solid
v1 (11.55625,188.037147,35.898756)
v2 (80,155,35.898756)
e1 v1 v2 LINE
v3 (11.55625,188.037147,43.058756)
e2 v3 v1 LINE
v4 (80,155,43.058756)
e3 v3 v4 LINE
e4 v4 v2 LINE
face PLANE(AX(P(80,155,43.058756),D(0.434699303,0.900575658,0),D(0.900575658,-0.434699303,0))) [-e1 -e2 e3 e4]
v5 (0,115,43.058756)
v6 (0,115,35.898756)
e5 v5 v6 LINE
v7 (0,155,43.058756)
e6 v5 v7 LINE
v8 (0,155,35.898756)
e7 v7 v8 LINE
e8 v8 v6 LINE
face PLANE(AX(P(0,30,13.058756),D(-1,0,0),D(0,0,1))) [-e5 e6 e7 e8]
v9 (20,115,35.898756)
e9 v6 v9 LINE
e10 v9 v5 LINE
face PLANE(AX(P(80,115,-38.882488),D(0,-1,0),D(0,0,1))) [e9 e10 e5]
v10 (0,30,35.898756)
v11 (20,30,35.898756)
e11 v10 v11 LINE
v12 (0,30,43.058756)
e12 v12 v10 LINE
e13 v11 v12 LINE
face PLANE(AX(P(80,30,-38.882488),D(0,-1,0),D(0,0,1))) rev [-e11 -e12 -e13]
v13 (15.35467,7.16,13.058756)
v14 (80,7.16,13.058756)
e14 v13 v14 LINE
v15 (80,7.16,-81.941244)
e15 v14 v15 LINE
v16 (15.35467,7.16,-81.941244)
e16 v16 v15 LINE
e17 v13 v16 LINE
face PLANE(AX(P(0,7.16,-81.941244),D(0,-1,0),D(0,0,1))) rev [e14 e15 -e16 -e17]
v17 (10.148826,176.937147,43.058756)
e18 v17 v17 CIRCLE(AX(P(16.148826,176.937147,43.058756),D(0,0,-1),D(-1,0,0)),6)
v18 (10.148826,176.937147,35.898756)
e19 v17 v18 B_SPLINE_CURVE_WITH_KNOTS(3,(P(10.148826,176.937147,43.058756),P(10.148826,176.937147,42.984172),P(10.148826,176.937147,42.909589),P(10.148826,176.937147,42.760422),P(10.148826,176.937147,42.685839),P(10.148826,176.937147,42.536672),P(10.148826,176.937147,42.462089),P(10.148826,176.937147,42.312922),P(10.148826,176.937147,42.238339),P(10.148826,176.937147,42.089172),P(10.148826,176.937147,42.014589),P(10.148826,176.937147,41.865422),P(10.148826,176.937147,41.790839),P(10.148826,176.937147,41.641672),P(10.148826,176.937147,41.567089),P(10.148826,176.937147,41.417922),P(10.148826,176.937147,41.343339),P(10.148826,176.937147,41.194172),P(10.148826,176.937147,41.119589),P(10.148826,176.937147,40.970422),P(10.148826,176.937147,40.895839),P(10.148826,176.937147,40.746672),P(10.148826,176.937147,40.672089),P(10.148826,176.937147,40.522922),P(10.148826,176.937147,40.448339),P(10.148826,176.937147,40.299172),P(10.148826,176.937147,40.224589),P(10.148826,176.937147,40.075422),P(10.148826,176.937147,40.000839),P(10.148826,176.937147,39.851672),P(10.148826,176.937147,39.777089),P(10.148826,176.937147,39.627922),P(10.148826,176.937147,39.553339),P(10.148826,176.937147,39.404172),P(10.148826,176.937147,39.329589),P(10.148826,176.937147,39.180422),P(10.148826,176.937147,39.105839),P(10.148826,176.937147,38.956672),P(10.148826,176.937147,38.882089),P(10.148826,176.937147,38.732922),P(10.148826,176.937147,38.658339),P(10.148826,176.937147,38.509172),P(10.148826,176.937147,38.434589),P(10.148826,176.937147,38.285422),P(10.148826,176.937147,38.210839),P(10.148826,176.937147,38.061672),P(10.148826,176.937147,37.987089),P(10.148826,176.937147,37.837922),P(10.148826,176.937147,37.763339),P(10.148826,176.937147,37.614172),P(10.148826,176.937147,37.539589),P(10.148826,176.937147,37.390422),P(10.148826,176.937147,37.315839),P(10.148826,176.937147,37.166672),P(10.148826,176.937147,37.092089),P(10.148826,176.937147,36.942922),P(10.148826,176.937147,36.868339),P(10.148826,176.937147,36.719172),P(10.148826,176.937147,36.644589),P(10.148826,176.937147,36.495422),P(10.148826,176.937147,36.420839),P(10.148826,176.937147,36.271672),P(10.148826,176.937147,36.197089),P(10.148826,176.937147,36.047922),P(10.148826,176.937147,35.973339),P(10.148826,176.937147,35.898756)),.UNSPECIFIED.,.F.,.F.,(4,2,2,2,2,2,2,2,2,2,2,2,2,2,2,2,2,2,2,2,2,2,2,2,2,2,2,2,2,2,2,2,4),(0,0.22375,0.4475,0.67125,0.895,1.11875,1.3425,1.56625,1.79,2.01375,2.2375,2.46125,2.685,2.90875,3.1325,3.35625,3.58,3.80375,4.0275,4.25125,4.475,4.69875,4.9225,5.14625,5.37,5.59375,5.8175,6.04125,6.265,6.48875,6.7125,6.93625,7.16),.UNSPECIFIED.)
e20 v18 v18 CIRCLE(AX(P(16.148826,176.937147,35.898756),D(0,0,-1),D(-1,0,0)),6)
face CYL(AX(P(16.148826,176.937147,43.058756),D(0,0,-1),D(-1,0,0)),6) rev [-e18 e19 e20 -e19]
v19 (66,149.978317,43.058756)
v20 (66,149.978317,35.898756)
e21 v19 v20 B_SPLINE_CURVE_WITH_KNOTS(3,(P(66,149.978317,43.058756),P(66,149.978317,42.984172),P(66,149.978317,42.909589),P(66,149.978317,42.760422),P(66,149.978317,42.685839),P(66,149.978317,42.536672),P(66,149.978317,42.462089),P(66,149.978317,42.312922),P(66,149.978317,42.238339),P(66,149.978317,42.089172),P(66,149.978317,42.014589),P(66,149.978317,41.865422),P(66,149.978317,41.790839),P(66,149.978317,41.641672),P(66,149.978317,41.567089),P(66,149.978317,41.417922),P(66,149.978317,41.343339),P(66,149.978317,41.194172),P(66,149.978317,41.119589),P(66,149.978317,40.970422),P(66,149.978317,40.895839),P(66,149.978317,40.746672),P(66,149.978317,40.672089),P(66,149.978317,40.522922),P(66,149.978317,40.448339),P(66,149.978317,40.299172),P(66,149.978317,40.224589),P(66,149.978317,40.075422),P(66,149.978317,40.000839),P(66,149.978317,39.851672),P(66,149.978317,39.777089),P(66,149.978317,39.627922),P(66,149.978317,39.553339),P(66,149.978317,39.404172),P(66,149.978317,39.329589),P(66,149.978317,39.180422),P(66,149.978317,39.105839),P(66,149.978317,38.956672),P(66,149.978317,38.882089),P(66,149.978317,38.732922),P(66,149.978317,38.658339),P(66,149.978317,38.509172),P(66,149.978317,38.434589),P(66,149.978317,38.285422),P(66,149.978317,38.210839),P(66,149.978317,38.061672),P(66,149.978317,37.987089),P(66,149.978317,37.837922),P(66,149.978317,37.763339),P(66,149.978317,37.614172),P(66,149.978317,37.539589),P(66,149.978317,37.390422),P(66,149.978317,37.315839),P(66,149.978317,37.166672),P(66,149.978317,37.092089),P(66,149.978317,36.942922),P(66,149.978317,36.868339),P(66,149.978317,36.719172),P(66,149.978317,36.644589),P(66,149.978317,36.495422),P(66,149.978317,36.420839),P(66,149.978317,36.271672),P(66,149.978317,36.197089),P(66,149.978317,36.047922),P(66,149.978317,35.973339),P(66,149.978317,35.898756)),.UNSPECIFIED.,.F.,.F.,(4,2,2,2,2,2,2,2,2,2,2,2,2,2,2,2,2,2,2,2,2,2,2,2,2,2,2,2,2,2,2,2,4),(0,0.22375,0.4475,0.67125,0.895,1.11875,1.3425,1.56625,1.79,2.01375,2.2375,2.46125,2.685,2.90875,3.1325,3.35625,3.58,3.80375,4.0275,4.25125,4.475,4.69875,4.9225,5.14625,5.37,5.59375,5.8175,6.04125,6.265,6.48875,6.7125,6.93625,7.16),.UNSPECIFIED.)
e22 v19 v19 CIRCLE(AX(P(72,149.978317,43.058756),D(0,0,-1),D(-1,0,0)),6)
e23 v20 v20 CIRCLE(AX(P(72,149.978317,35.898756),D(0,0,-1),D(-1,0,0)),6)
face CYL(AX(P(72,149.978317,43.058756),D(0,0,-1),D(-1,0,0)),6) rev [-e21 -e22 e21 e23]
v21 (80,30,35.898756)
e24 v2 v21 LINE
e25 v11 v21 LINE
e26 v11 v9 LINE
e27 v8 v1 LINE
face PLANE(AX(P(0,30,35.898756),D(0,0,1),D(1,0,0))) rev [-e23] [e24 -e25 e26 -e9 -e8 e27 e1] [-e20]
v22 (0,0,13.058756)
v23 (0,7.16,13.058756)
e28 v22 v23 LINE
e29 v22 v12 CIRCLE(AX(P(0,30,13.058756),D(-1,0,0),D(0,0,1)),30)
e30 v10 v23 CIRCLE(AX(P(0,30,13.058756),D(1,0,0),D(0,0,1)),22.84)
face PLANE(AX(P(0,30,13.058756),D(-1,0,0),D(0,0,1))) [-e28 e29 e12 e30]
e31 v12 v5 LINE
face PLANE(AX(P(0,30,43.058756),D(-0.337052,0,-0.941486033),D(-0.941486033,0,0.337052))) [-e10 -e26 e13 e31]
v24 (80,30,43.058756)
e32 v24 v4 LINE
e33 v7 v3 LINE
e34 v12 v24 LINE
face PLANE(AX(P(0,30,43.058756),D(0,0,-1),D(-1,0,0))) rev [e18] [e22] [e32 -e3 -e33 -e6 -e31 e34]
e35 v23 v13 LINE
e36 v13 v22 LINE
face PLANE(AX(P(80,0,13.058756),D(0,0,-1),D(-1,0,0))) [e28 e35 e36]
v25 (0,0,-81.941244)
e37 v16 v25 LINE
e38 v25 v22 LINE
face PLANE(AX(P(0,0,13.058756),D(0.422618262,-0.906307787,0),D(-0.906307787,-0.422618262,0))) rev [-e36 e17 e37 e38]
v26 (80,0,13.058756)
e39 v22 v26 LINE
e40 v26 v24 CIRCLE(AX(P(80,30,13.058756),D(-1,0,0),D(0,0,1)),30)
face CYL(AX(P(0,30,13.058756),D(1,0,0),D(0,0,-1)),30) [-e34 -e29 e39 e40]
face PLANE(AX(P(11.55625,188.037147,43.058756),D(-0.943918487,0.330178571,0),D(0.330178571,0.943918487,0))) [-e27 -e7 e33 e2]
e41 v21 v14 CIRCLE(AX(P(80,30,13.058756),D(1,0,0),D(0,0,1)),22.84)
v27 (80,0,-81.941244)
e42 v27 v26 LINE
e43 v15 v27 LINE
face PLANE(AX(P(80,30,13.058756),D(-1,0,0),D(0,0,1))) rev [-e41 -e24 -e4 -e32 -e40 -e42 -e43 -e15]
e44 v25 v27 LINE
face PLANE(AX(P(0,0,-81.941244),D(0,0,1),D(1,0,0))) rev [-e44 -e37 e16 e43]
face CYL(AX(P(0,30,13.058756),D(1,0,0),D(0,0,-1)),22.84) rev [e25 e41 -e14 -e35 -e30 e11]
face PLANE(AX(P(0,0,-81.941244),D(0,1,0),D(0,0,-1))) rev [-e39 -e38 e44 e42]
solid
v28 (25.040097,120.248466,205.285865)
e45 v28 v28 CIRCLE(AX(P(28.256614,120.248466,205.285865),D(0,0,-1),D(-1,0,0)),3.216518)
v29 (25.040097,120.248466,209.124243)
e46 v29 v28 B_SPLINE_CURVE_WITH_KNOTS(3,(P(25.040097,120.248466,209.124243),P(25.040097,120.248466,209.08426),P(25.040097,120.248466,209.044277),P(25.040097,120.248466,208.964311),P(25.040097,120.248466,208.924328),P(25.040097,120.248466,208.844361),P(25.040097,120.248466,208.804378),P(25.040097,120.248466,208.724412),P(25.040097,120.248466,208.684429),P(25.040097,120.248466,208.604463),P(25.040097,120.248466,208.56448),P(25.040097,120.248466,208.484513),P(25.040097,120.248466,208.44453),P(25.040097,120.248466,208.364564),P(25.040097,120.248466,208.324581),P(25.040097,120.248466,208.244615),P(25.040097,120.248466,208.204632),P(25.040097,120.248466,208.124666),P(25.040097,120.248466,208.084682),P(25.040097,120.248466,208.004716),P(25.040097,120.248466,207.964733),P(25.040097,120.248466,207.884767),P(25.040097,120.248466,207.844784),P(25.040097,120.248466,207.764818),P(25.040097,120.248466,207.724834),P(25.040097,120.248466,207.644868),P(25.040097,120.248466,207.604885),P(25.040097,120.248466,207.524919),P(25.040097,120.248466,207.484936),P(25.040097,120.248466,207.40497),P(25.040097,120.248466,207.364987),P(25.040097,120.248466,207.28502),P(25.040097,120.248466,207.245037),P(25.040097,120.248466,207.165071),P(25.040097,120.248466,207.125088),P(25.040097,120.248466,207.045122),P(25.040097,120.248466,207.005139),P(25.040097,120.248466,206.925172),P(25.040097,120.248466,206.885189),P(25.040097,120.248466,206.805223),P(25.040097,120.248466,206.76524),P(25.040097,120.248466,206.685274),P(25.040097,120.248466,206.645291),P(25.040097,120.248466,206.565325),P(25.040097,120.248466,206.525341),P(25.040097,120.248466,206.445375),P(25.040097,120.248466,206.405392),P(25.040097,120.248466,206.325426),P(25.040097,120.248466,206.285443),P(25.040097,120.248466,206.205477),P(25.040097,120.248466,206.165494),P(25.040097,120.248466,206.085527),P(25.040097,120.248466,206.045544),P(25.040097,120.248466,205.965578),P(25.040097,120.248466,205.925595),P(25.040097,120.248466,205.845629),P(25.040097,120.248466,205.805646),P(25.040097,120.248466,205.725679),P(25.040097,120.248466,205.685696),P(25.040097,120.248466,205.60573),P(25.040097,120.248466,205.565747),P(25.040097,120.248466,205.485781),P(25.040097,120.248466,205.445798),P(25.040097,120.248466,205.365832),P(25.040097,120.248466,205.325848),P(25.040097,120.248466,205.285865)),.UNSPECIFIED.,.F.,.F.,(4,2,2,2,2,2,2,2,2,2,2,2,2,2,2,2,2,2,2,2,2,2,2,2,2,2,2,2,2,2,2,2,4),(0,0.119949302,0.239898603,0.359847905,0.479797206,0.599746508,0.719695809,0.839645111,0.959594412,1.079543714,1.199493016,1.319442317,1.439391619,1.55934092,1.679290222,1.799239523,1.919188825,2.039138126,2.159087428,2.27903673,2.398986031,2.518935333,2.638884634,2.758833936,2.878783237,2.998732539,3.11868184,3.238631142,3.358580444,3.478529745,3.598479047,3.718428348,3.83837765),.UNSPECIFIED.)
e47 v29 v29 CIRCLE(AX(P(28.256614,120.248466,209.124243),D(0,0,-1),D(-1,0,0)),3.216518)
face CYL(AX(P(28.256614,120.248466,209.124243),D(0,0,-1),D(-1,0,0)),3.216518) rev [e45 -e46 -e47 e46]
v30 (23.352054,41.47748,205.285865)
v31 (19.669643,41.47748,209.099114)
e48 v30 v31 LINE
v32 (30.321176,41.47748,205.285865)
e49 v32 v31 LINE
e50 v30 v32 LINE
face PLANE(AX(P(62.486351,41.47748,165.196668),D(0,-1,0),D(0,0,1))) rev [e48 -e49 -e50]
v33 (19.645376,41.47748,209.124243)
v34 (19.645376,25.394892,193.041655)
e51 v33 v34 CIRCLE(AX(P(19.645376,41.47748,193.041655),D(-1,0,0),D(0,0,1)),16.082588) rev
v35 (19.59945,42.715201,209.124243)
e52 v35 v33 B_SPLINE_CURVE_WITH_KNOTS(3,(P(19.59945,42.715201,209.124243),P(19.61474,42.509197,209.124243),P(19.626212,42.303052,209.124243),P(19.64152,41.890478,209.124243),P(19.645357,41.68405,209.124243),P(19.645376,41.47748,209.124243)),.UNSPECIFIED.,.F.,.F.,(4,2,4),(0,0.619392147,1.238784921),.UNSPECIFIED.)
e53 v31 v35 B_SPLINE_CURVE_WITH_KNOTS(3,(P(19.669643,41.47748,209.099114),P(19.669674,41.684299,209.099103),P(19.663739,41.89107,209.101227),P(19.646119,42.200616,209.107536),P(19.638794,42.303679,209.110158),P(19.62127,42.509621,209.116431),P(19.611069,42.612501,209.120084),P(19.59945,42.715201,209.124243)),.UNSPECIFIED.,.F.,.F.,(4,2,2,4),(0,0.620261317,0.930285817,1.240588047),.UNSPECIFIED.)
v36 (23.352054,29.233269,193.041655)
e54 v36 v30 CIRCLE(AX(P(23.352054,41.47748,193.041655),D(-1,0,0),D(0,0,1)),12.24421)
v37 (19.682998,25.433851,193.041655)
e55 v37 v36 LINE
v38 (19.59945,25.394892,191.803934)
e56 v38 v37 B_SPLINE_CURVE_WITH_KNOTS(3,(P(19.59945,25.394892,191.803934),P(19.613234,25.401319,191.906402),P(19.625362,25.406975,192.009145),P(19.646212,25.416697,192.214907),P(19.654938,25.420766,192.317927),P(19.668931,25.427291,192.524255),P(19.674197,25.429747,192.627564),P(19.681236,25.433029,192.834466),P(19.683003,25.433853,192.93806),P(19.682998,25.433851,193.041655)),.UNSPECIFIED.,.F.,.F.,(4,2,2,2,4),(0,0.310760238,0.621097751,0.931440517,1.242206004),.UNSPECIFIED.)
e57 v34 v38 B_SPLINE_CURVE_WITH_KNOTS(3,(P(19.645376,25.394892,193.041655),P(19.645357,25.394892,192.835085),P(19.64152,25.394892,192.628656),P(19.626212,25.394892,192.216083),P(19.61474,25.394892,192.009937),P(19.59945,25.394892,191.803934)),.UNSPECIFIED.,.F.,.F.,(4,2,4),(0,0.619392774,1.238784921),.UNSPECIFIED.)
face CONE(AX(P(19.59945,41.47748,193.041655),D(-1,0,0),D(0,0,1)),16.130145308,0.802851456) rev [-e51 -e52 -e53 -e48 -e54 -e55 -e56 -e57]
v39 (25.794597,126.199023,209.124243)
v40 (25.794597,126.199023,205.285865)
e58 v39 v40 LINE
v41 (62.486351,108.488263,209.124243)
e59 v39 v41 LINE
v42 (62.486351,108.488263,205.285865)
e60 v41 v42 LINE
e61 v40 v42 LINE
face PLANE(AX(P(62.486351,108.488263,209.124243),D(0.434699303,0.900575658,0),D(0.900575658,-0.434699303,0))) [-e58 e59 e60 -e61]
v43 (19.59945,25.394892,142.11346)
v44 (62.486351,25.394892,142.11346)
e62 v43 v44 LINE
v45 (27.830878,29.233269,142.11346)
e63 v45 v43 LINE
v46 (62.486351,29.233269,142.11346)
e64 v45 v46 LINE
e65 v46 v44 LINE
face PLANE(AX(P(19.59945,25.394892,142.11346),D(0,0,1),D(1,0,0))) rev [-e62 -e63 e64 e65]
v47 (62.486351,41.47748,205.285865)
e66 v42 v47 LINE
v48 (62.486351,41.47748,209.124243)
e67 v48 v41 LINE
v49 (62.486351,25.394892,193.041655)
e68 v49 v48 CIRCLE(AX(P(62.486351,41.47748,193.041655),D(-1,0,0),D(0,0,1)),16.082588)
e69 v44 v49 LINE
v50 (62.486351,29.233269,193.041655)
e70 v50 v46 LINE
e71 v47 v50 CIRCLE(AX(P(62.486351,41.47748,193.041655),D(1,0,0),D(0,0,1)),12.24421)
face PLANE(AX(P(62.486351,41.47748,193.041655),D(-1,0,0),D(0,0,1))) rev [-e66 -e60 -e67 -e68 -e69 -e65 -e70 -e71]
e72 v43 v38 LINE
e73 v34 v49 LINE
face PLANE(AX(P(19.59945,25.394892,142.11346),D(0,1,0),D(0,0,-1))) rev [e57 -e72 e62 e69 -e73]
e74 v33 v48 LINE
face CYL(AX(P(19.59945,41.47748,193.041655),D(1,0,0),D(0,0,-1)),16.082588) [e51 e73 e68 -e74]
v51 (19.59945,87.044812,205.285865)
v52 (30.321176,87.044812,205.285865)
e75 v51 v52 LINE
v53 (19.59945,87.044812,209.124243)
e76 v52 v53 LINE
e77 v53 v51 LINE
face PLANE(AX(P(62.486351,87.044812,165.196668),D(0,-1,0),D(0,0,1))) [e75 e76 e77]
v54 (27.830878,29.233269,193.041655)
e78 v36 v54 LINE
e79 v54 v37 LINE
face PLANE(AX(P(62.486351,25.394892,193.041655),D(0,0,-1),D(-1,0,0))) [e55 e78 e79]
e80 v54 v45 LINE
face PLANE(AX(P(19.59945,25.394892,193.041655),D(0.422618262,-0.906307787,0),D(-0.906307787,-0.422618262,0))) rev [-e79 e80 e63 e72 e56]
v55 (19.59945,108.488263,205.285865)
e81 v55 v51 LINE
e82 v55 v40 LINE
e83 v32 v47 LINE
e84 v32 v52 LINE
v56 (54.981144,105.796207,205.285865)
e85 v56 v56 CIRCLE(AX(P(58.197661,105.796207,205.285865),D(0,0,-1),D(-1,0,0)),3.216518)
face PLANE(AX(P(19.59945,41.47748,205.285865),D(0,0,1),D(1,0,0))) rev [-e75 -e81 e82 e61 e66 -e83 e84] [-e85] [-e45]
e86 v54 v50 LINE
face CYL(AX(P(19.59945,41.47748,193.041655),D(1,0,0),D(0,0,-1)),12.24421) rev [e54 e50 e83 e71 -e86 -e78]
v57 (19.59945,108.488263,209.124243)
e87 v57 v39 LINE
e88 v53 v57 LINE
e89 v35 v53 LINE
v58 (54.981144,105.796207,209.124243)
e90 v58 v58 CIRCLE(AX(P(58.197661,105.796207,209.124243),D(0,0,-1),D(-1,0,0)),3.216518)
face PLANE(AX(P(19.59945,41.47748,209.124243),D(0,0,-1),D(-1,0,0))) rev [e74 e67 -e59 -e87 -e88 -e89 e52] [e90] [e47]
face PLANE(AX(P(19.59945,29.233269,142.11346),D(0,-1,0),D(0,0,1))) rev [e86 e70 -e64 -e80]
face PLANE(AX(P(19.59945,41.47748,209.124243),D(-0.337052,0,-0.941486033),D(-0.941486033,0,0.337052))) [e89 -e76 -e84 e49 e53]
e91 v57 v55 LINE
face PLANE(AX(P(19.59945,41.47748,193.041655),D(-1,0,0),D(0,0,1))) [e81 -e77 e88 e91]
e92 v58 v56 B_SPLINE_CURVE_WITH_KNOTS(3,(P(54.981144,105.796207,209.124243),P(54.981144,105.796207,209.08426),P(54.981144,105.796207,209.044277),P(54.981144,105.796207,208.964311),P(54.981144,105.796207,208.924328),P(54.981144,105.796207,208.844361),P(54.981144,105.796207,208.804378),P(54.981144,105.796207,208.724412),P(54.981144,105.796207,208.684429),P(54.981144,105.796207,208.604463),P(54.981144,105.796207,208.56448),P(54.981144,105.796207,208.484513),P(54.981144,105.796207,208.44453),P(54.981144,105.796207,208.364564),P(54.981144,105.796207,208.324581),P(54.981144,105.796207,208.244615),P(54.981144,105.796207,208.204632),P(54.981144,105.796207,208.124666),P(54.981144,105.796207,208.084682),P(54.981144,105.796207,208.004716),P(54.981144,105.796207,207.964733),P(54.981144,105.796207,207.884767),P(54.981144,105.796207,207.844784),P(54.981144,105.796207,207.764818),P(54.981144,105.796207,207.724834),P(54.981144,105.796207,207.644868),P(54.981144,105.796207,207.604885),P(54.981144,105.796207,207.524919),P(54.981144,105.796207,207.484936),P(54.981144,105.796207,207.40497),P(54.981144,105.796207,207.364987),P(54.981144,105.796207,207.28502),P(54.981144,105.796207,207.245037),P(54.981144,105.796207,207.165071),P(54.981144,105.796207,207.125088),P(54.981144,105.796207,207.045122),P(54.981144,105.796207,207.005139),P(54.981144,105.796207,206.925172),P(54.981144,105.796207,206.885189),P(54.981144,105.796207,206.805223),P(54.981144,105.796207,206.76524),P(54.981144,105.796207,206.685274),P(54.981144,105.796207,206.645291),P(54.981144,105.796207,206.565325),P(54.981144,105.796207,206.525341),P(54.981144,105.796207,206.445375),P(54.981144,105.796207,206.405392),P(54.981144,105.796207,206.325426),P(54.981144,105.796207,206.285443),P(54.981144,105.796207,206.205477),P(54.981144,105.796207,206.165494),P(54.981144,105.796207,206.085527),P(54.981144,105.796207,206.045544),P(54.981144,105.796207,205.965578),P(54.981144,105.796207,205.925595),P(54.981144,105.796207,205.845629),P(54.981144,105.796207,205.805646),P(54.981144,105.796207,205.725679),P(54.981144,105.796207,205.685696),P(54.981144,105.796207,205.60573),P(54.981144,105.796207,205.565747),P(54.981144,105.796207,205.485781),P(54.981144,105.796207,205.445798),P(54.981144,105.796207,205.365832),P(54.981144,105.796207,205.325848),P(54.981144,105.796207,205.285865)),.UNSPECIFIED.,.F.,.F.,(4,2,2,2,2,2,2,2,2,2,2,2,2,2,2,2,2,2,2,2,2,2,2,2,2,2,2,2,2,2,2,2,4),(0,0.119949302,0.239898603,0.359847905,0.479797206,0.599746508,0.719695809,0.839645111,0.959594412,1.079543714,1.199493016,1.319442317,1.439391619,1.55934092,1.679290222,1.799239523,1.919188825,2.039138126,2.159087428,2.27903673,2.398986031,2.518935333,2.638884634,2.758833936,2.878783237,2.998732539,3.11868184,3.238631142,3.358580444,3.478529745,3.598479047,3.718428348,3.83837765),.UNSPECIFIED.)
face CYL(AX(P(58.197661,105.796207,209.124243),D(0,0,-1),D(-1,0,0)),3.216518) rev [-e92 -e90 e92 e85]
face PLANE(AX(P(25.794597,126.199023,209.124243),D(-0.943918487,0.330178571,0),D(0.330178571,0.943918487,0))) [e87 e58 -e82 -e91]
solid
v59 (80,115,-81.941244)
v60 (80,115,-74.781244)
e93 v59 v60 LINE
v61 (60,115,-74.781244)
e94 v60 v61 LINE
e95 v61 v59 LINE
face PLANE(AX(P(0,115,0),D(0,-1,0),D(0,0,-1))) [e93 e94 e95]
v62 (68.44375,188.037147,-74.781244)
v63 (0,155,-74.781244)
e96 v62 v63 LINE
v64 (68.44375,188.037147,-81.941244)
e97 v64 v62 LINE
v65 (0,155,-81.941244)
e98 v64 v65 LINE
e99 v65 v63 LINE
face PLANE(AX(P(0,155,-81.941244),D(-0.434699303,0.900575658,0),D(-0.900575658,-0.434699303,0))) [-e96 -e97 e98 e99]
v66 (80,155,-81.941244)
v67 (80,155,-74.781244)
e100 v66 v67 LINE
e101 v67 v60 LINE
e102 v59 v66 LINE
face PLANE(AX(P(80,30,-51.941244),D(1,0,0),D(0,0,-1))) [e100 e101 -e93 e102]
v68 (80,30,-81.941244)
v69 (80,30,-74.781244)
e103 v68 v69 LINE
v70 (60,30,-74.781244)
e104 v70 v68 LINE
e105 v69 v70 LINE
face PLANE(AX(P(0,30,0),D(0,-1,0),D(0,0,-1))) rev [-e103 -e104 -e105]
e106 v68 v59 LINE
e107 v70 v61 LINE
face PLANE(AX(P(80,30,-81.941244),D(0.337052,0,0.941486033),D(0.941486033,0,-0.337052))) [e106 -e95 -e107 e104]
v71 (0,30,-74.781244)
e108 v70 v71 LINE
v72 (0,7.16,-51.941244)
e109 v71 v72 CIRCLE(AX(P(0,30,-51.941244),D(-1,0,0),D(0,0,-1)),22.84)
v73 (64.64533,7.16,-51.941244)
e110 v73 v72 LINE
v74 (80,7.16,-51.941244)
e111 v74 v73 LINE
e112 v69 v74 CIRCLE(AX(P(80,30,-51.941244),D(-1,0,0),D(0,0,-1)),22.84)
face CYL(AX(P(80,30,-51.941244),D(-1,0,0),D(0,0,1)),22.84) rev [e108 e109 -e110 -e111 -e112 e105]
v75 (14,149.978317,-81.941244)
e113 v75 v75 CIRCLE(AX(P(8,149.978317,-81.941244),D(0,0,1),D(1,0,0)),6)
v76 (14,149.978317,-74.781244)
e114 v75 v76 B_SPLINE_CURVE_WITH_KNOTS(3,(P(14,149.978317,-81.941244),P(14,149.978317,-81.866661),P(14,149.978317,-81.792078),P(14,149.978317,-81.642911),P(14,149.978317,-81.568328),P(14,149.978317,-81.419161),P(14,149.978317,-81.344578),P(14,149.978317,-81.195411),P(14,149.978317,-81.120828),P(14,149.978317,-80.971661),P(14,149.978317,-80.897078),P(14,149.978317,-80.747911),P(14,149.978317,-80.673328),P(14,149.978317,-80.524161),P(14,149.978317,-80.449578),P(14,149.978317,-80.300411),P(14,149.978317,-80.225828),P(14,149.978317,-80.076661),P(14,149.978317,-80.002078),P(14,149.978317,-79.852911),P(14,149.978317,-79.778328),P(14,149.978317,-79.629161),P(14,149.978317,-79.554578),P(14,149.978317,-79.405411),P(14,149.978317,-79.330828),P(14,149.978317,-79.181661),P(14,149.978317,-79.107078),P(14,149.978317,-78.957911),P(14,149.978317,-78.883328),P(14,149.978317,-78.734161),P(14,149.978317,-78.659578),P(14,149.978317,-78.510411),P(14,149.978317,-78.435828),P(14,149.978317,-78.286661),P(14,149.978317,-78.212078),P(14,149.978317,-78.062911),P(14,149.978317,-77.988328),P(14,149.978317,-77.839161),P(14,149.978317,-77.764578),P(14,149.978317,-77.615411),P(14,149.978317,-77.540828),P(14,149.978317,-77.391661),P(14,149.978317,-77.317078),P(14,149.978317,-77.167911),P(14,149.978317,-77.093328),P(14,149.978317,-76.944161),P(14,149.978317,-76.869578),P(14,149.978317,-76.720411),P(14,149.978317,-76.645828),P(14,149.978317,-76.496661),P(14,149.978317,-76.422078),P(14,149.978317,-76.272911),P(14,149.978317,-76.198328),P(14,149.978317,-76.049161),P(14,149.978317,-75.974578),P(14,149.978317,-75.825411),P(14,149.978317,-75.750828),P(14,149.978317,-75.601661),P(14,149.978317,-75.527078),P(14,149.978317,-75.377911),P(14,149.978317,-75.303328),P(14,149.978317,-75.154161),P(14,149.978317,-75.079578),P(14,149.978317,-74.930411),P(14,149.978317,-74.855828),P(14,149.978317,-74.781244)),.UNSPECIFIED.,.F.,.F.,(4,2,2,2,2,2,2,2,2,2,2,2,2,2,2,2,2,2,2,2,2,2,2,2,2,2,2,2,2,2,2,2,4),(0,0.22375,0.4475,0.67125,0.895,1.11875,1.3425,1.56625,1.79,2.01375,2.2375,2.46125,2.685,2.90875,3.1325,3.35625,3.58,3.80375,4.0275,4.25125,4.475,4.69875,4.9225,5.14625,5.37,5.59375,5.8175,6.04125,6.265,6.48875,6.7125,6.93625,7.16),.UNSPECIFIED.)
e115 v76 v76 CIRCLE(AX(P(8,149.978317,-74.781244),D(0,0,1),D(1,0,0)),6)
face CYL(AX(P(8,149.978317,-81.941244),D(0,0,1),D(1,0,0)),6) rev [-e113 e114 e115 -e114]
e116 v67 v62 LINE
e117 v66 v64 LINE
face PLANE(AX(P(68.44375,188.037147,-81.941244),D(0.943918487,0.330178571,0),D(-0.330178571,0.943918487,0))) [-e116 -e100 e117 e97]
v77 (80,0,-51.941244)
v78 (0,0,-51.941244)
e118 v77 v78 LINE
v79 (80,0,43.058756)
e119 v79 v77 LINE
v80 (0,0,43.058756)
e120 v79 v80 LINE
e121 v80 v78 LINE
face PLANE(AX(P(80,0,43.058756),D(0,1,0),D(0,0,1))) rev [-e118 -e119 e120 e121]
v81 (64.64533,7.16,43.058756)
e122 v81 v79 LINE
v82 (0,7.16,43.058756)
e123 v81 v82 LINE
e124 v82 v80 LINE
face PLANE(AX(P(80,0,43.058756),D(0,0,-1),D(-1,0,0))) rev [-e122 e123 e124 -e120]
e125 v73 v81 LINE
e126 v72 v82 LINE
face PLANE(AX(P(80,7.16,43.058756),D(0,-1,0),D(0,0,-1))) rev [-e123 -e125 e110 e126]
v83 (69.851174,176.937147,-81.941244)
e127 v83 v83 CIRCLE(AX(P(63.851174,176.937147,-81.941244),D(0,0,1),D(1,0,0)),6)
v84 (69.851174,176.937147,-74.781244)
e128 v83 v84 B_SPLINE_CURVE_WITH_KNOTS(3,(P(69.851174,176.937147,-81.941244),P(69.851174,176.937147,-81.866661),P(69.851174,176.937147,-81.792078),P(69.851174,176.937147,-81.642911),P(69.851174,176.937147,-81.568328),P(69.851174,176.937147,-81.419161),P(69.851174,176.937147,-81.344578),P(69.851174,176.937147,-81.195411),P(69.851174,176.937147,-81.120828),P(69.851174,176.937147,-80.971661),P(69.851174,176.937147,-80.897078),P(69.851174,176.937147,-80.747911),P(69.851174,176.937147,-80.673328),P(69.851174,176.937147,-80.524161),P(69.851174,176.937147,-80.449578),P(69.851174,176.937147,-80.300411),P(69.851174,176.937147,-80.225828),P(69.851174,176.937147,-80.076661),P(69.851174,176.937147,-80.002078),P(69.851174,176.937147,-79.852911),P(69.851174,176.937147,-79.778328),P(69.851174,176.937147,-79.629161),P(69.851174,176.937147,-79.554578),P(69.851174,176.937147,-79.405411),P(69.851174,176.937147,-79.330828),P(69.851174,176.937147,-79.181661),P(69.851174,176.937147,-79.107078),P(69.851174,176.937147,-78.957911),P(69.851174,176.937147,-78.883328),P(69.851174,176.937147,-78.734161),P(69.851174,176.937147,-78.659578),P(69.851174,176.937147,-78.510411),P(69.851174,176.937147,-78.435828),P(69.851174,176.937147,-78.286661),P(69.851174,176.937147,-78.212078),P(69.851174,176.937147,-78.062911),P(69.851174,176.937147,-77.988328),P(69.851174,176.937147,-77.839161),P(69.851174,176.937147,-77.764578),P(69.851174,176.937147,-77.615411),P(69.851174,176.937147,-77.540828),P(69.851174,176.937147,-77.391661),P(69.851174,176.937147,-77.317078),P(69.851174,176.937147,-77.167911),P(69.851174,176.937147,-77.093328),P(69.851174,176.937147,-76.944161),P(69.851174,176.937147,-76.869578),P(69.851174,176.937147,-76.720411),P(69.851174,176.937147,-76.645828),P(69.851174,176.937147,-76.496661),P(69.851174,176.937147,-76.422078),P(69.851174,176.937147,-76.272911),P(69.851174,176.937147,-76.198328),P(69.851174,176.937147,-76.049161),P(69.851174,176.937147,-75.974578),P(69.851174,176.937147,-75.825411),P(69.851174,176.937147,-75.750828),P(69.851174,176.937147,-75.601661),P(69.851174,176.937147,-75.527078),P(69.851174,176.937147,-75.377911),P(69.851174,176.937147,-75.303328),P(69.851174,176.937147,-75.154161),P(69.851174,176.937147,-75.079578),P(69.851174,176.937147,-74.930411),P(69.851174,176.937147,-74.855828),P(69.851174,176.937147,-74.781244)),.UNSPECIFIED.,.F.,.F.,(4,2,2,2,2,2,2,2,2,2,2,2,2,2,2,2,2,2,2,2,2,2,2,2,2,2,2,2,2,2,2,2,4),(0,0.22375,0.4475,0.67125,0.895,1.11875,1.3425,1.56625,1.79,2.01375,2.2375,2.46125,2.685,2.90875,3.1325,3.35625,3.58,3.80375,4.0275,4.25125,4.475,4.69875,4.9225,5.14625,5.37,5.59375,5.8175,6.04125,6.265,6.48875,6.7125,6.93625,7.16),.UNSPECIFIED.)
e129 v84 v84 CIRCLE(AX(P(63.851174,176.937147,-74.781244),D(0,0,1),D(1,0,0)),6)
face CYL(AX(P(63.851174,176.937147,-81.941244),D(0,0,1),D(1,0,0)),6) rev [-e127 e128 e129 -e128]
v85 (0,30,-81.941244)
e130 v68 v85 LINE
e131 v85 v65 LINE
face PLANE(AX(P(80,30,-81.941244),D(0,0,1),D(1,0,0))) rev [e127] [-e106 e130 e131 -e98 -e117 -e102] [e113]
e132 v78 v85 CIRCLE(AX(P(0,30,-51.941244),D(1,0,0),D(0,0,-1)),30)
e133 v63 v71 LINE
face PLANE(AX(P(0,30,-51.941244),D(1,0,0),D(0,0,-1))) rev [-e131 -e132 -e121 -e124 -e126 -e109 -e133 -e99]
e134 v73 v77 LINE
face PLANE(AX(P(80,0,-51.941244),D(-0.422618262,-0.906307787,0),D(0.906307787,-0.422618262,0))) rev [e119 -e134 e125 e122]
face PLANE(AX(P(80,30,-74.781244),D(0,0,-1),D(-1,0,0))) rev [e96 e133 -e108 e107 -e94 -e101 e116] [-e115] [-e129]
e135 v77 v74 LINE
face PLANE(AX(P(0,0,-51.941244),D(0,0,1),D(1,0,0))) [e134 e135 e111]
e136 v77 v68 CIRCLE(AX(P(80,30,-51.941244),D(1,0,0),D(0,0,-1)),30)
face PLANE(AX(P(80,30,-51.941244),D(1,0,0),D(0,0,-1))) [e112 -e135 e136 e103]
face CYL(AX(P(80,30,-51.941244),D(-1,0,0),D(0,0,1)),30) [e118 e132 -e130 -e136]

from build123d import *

# Parameters (mm, degrees)
BOSS_EXTRUDE1_DEPTH   = 80
BOSS_EXTRUDE2_DEPTH   = 7.16
SKETCH3_R             = 6
CUT_EXTRUDE1_DEPTH    = 7.16
CUT_EXTRUDE6_DEPTH    = 95
CUT_EXTRUDE7_DEPTH    = 85
BODY_MOVE_COPY5_ANGLE = 180
CHAMFER1_SIZE         = 7
CHAMFER1_SIZE_2       = 7.248712197
SCALE1_SCALE          = 0.714781685
SCALE2_SCALE          = 0.5
SCALE3_SCALE          = 1.5


with BuildPart() as part:
    # Sketch1 → Boss-Extrude1 (new body)
    with BuildSketch(Plane(origin=(0, 0, 0), x_dir=(0, 0, -1), z_dir=(1, 0, 0))):
        with BuildLine():
            Line((-43.05875576, 0), (51.94124424, 0))
            ThreePointArc((51.94124424, 0), (73.154447675, 8.786796564), (81.94124424, 30))
            Line((81.94124424, 30), (81.94124424, 155))
            Line((81.94124424, 155), (74.78124424, 155))
            Line((74.78124424, 155), (74.78124424, 30))
            ThreePointArc((74.78124424, 30), (68.091563122, 13.849681118), (51.94124424, 7.16))
            Line((51.94124424, 7.16), (-43.05875576, 7.16))
            Line((-43.05875576, 7.16), (-43.05875576, 0))
        make_face()
    extrude(amount=BOSS_EXTRUDE1_DEPTH)

    # Sketch2 → Boss-Extrude2 (add)
    with BuildSketch(Plane.XY.offset(-74.78124424)):
        Polygon((0, 155), (68.44375, 188.037147061), (80, 155), align=None)
    extrude(amount=-BOSS_EXTRUDE2_DEPTH)

    # Sketch3 → Cut-Extrude1 (cut)
    with BuildSketch(Plane.XY.offset(-74.78124424)):
        with Locations((63.851173507, 176.937147061)):
            Circle(SKETCH3_R)
        with Locations((8, 149.978316888)):
            Circle(SKETCH3_R)
    extrude(amount=-CUT_EXTRUDE1_DEPTH, mode=Mode.SUBTRACT)

    # Sketch6 → Cut-Extrude6 (cut)
    with BuildSketch(Plane.XY.offset(43.05875576)):
        Polygon((80, 0), (64.645330449, 7.16), (80, 7.16), align=None)
    extrude(amount=-CUT_EXTRUDE6_DEPTH, mode=Mode.SUBTRACT)

    # Sketch10 → Cut-Extrude7 (cut)
    with BuildSketch(Plane(origin=(0, 115, 0), x_dir=(-1, 0, 0), z_dir=(0, -1, 0))):
        Polygon((-80, 81.94124424), (-60, 74.78124424), (-80, 74.78124424), align=None)
    extrude(amount=CUT_EXTRUDE7_DEPTH, mode=Mode.SUBTRACT)


with BuildPart() as body_2:
    # Body-Move/Copy5: copy of part
    add(part.part.rotate(Axis((40, 0, -19.44124424), (0, 1, 0)), BODY_MOVE_COPY5_ANGLE))


with BuildPart() as body_3:
    # Body-Move/Copy6: copy of body 2
    add(body_2.part.moved(Location((0, 0, 180))))

    # Chamfer1
    # the kernel refuses this chamfer: 7.248712197, 7 mm, written as the material it takes off along each edge
    with BuildSketch(Plane(origin=(0, 30, 193.05875576), x_dir=(-4.3395359515607355e-15, 0.7290125666970131, 0.684500312343123), z_dir=(4.621730896647766e-15, 0.684500312343123, -0.7290125666970131))) as chamfer1_piece_1:
        Polygon((22.84, CHAMFER1_SIZE), (22.84 + CHAMFER1_SIZE_2, 0), (22.84, 0), align=None)
    revolve(axis=Axis((0, 30, 193.05875576), (1, 0, 0)), revolution_arc=183.607355582, mode=Mode.SUBTRACT)


with BuildPart() as body_3_1:
    # Scale1: scaled about (42.248049125, 54.740546913, 193.021894029)
    add(body_3.part.scale(SCALE1_SCALE).moved(Location((12.049917373, 15.613006539, 55.053379325))))


with BuildPart() as body_3_2:
    # Scale2: scaled about (42.248049125, 54.740546913, 193.021894029)
    add(body_3_1.part.scale(SCALE2_SCALE).moved(Location((21.124024563, 27.370273457, 96.510947015))))


with BuildPart() as body_3_3:
    # Scale3: scaled about (42.248049125, 54.740546913, 193.021894029)
    add(body_3_2.part.scale(SCALE3_SCALE).moved(Location((-21.124024563, -27.370273457, -96.510947015))))


solid = Compound([part.part, body_2.part, body_3_3.part])
